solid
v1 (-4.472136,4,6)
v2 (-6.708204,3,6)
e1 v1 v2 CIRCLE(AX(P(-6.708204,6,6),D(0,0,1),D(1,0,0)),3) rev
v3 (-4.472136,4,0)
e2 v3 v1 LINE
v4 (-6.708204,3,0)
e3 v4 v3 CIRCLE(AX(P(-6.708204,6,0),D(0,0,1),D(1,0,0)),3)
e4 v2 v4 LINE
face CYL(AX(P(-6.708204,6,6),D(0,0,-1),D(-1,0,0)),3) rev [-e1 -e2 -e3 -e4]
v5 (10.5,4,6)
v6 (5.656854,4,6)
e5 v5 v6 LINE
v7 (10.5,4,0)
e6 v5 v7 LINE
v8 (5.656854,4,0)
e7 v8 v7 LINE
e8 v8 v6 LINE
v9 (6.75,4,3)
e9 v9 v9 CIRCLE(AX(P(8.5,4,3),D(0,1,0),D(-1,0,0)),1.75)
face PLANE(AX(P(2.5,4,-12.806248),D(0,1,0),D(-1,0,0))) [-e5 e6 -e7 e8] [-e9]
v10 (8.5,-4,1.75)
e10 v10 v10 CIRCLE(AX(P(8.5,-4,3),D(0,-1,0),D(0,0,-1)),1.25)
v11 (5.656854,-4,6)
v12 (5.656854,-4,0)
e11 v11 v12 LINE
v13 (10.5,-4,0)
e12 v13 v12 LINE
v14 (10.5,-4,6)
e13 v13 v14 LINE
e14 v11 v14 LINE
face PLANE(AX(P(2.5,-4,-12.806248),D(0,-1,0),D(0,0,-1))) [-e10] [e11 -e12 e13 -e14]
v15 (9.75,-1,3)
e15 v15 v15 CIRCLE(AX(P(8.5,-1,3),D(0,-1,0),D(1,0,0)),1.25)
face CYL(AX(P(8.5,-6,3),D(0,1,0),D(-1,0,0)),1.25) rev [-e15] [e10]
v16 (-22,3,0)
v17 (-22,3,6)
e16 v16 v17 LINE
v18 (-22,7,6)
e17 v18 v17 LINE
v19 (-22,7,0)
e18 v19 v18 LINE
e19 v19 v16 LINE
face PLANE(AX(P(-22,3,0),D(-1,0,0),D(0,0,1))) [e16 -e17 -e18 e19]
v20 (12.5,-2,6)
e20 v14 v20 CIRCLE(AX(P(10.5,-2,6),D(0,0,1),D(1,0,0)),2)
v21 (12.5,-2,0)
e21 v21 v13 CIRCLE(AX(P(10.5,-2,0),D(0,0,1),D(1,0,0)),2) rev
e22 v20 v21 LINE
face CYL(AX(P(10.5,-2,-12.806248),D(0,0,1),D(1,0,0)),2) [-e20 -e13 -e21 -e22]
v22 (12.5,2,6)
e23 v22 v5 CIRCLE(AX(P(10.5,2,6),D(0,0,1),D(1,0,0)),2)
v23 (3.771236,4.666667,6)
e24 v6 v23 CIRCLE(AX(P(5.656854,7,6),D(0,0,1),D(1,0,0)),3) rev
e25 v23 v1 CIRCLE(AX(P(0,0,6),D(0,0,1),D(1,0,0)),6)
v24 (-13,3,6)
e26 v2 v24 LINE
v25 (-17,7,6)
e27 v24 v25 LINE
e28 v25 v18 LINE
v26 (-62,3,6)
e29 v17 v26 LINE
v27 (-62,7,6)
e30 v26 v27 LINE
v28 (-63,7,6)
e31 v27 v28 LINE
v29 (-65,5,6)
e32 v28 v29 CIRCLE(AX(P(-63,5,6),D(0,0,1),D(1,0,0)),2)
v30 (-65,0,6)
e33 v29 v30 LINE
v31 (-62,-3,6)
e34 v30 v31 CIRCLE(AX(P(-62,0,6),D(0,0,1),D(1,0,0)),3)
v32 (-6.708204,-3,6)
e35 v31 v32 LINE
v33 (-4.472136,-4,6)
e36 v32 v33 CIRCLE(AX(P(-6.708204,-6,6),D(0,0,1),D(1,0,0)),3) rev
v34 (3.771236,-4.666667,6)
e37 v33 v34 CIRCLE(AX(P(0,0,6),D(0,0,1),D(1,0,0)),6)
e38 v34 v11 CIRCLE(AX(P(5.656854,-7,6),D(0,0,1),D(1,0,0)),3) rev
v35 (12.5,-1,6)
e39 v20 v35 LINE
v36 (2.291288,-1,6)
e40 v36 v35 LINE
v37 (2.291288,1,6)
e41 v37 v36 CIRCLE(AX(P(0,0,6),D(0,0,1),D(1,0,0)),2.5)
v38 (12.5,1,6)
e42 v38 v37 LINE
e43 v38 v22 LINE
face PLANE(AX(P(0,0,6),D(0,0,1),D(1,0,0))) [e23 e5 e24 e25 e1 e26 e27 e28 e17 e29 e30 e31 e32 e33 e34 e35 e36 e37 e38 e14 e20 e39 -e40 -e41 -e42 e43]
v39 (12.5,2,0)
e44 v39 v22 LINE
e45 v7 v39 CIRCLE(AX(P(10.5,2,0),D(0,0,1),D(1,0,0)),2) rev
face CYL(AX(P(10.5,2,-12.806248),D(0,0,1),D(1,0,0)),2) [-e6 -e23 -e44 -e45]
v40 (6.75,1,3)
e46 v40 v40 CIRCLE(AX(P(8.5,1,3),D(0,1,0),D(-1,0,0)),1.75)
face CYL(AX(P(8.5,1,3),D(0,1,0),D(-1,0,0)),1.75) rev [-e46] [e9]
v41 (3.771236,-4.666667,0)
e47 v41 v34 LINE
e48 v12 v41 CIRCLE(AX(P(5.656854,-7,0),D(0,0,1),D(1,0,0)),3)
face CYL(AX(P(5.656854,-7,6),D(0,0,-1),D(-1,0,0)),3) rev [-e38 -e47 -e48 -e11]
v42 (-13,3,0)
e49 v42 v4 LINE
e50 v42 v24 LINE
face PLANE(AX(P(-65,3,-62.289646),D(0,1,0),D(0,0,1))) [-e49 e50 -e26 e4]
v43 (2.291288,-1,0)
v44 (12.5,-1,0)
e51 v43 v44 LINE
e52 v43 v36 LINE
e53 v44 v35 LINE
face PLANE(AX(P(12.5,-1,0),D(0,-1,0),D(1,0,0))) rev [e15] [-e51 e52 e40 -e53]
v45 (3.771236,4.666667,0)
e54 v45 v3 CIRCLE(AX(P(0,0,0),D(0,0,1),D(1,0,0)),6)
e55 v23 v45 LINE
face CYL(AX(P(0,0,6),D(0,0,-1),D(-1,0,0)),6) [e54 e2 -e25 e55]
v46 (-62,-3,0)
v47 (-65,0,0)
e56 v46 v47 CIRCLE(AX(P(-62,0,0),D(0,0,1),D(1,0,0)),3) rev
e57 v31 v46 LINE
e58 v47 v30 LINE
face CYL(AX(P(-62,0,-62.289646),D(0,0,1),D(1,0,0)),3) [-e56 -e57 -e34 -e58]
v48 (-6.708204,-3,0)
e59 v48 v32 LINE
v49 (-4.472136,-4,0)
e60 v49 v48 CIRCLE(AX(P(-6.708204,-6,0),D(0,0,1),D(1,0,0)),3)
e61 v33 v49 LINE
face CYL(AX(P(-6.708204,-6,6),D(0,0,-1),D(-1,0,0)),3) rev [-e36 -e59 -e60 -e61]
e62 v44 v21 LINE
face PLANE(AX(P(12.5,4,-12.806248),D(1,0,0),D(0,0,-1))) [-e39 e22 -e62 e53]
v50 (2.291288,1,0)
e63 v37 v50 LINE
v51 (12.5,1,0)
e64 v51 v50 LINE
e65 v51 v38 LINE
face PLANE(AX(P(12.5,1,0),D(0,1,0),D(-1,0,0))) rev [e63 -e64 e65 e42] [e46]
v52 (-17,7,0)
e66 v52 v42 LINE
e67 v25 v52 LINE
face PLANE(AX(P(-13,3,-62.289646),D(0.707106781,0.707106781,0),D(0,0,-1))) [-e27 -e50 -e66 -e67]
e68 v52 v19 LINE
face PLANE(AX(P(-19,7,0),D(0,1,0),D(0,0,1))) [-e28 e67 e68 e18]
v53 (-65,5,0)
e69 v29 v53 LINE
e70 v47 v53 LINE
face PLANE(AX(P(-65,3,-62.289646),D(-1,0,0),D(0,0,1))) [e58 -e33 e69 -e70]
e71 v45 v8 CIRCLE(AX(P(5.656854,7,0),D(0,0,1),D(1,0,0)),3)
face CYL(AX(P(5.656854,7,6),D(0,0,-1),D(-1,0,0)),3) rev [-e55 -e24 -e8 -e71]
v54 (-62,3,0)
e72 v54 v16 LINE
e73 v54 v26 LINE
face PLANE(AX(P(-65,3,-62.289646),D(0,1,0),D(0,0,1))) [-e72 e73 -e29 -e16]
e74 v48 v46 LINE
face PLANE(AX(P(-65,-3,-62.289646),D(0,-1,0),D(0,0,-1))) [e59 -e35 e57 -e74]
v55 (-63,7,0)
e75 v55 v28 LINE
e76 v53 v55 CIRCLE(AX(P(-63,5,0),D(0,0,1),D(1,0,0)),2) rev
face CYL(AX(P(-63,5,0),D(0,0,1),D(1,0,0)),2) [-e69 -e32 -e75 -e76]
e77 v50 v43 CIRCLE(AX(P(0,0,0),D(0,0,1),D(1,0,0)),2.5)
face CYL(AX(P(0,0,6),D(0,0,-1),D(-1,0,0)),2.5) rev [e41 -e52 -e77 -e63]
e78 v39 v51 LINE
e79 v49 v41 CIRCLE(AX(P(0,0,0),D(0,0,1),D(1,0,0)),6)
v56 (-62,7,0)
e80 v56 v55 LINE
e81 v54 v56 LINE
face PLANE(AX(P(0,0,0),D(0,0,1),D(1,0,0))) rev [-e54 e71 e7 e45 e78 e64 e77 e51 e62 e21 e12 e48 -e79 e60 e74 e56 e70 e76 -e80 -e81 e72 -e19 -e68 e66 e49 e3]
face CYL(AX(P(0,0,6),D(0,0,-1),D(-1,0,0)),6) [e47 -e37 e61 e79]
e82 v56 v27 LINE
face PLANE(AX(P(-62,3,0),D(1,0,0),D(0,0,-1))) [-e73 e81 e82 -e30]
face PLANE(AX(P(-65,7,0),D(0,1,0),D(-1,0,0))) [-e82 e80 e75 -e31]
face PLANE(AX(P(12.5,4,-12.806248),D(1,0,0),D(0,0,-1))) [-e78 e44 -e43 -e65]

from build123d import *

# Parameters (mm, degrees)
ESQUISSE1_R                  = 6
ESQUISSE1_R_2                = 2.5
BOSS_EXTRU_1_DEPTH           = 6
ESQUISSE2_W                  = 62
ESQUISSE2_H                  = 6
BOSS_EXTRU_2_DEPTH           = 6
ESQUISSE3_W                  = 10
ESQUISSE3_H                  = 8
BOSS_EXTRU_3_DEPTH           = 6
CONG_1_R                     = 3
ENL_V_MAT_EXTRU_1_DEPTH      = 66.551506466
ENL_V_MAT_EXTRU_1_DEPTH_BACK = 66.551506466
ESQUISSE4_W                  = 12
ESQUISSE4_H                  = 2
ENL_V_MAT_EXTRU_2_DEPTH      = 67.037867924
ENL_V_MAT_EXTRU_2_DEPTH_BACK = 67.037867924
ESQUISSE5_R                  = 1.25
ESQUISSE6_R                  = 1.75
ENL_V_MAT_EXTRU_3_DEPTH      = 3
CONG_2_R                     = 2
ESQUISSE7_W                  = 3
ESQUISSE7_H                  = 4
BOSS_EXTRU_4_DEPTH           = 6
CHANFREIN1_SIZE              = 6
CONG_3_R                     = 2


with BuildPart() as part:
    # Esquisse1 → Boss.-Extru.1 (new body)
    with BuildSketch(Plane.XY):
        Circle(ESQUISSE1_R)
        Circle(ESQUISSE1_R_2, mode=Mode.SUBTRACT)
    extrude(amount=BOSS_EXTRU_1_DEPTH)

    # Esquisse2 → Boss.-Extru.2 (add)
    with BuildSketch(Plane.XY.offset(6)):
        with Locations((-34, 0)):
            Rectangle(ESQUISSE2_W, ESQUISSE2_H)
    extrude(amount=-BOSS_EXTRU_2_DEPTH)

    # Esquisse3 → Boss.-Extru.3 (add)
    with BuildSketch(Plane.XY.offset(6)):
        with Locations((7.5, 0)):
            Rectangle(ESQUISSE3_W, ESQUISSE3_H)
    extrude(amount=-BOSS_EXTRU_3_DEPTH)

    # Congé1
    cong_1_edges = [part.edges().sort_by_distance(p)[0] for p in [
        (-5.196152423, -3, 3),
        (-5.196152423, 3, 3),
        (-65, -3, 3),
        (4.472135955, -4, 3),
        (4.472135955, 4, 3),
    ]]
    fillet(cong_1_edges, radius=CONG_1_R)

    # Esquisse4 → Enlèv. mat.-Extru.1 (cut, two sides: drawn at the far end of the back side and taken through both)
    with BuildSketch(Plane.XY.offset(6).offset(-ENL_V_MAT_EXTRU_1_DEPTH_BACK)):
        with Locations((6.5, 0)):
            Rectangle(ESQUISSE4_W, ESQUISSE4_H)
    extrude(amount=ENL_V_MAT_EXTRU_1_DEPTH + ENL_V_MAT_EXTRU_1_DEPTH_BACK, mode=Mode.SUBTRACT)

    # Esquisse5 → Enlèv. mat.-Extru.2 (cut, two sides: drawn at the far end of the back side and taken through both)
    with BuildSketch(Plane(origin=(0, 4, 0), x_dir=(1, 0, 0), z_dir=(0, 1, 0)).offset(-ENL_V_MAT_EXTRU_2_DEPTH_BACK)):
        with Locations(Location((8.5, -3, 0), (0, 0, 90))):
            Circle(ESQUISSE5_R)
    extrude(amount=ENL_V_MAT_EXTRU_2_DEPTH + ENL_V_MAT_EXTRU_2_DEPTH_BACK, mode=Mode.SUBTRACT)

    # Esquisse6 → Enlèv. mat.-Extru.3 (cut)
    with BuildSketch(Plane(origin=(0, 4, 0), x_dir=(1, 0, 0), z_dir=(0, 1, 0))):
        with Locations(Location((8.5, -3, 0), (0, 0, 180))):
            Circle(ESQUISSE6_R)
    extrude(amount=-ENL_V_MAT_EXTRU_3_DEPTH, mode=Mode.SUBTRACT)

    # Congé2
    cong_2_edges = [part.edges().sort_by_distance(p)[0] for p in [
        (12.5, -4, 3),
        (12.5, 4, 3),
    ]]
    fillet(cong_2_edges, radius=CONG_2_R)

    # Esquisse7 → Boss.-Extru.4 (add)
    with BuildSketch(Plane.XY.offset(6)):
        with Locations((-63.5, 5)):
            Rectangle(ESQUISSE7_W, ESQUISSE7_H)
        with Locations((-20.5, 5)):
            Rectangle(ESQUISSE7_W, ESQUISSE7_H)
    extrude(amount=-BOSS_EXTRU_4_DEPTH)

    # Chanfrein1
    # the kernel refuses this chamfer: 6 mm, written as the material it adds along each edge
    with BuildSketch(Plane(origin=(-19, 3, 6), x_dir=(-0.027495876610586202, 0.9996219169112968, 0), z_dir=(0, 0, -1))) as chanfrein1_piece_1_section:
        Polygon((CHANFREIN1_SIZE * 0.999621916911, CHANFREIN1_SIZE * 0.0274958766106), (-CHANFREIN1_SIZE * 0.0274958766106, CHANFREIN1_SIZE * 0.999621916911), (0, 0), align=None)
    chanfrein1_piece_1 = extrude(amount=6, mode=Mode.PRIVATE)
    chanfrein1_piece_1 = split(chanfrein1_piece_1, bisect_by=Plane(origin=(-16.81581799, 7, 3), z_dir=(0, -1, 0)), keep=Keep.TOP, mode=Mode.PRIVATE)
    add(chanfrein1_piece_1)

    # Congé3
    cong_3_edges = [part.edges().sort_by_distance(p)[0] for p in [
        (-65, 7, 3),
    ]]
    fillet(cong_3_edges, radius=CONG_3_R)


solid = part.part
